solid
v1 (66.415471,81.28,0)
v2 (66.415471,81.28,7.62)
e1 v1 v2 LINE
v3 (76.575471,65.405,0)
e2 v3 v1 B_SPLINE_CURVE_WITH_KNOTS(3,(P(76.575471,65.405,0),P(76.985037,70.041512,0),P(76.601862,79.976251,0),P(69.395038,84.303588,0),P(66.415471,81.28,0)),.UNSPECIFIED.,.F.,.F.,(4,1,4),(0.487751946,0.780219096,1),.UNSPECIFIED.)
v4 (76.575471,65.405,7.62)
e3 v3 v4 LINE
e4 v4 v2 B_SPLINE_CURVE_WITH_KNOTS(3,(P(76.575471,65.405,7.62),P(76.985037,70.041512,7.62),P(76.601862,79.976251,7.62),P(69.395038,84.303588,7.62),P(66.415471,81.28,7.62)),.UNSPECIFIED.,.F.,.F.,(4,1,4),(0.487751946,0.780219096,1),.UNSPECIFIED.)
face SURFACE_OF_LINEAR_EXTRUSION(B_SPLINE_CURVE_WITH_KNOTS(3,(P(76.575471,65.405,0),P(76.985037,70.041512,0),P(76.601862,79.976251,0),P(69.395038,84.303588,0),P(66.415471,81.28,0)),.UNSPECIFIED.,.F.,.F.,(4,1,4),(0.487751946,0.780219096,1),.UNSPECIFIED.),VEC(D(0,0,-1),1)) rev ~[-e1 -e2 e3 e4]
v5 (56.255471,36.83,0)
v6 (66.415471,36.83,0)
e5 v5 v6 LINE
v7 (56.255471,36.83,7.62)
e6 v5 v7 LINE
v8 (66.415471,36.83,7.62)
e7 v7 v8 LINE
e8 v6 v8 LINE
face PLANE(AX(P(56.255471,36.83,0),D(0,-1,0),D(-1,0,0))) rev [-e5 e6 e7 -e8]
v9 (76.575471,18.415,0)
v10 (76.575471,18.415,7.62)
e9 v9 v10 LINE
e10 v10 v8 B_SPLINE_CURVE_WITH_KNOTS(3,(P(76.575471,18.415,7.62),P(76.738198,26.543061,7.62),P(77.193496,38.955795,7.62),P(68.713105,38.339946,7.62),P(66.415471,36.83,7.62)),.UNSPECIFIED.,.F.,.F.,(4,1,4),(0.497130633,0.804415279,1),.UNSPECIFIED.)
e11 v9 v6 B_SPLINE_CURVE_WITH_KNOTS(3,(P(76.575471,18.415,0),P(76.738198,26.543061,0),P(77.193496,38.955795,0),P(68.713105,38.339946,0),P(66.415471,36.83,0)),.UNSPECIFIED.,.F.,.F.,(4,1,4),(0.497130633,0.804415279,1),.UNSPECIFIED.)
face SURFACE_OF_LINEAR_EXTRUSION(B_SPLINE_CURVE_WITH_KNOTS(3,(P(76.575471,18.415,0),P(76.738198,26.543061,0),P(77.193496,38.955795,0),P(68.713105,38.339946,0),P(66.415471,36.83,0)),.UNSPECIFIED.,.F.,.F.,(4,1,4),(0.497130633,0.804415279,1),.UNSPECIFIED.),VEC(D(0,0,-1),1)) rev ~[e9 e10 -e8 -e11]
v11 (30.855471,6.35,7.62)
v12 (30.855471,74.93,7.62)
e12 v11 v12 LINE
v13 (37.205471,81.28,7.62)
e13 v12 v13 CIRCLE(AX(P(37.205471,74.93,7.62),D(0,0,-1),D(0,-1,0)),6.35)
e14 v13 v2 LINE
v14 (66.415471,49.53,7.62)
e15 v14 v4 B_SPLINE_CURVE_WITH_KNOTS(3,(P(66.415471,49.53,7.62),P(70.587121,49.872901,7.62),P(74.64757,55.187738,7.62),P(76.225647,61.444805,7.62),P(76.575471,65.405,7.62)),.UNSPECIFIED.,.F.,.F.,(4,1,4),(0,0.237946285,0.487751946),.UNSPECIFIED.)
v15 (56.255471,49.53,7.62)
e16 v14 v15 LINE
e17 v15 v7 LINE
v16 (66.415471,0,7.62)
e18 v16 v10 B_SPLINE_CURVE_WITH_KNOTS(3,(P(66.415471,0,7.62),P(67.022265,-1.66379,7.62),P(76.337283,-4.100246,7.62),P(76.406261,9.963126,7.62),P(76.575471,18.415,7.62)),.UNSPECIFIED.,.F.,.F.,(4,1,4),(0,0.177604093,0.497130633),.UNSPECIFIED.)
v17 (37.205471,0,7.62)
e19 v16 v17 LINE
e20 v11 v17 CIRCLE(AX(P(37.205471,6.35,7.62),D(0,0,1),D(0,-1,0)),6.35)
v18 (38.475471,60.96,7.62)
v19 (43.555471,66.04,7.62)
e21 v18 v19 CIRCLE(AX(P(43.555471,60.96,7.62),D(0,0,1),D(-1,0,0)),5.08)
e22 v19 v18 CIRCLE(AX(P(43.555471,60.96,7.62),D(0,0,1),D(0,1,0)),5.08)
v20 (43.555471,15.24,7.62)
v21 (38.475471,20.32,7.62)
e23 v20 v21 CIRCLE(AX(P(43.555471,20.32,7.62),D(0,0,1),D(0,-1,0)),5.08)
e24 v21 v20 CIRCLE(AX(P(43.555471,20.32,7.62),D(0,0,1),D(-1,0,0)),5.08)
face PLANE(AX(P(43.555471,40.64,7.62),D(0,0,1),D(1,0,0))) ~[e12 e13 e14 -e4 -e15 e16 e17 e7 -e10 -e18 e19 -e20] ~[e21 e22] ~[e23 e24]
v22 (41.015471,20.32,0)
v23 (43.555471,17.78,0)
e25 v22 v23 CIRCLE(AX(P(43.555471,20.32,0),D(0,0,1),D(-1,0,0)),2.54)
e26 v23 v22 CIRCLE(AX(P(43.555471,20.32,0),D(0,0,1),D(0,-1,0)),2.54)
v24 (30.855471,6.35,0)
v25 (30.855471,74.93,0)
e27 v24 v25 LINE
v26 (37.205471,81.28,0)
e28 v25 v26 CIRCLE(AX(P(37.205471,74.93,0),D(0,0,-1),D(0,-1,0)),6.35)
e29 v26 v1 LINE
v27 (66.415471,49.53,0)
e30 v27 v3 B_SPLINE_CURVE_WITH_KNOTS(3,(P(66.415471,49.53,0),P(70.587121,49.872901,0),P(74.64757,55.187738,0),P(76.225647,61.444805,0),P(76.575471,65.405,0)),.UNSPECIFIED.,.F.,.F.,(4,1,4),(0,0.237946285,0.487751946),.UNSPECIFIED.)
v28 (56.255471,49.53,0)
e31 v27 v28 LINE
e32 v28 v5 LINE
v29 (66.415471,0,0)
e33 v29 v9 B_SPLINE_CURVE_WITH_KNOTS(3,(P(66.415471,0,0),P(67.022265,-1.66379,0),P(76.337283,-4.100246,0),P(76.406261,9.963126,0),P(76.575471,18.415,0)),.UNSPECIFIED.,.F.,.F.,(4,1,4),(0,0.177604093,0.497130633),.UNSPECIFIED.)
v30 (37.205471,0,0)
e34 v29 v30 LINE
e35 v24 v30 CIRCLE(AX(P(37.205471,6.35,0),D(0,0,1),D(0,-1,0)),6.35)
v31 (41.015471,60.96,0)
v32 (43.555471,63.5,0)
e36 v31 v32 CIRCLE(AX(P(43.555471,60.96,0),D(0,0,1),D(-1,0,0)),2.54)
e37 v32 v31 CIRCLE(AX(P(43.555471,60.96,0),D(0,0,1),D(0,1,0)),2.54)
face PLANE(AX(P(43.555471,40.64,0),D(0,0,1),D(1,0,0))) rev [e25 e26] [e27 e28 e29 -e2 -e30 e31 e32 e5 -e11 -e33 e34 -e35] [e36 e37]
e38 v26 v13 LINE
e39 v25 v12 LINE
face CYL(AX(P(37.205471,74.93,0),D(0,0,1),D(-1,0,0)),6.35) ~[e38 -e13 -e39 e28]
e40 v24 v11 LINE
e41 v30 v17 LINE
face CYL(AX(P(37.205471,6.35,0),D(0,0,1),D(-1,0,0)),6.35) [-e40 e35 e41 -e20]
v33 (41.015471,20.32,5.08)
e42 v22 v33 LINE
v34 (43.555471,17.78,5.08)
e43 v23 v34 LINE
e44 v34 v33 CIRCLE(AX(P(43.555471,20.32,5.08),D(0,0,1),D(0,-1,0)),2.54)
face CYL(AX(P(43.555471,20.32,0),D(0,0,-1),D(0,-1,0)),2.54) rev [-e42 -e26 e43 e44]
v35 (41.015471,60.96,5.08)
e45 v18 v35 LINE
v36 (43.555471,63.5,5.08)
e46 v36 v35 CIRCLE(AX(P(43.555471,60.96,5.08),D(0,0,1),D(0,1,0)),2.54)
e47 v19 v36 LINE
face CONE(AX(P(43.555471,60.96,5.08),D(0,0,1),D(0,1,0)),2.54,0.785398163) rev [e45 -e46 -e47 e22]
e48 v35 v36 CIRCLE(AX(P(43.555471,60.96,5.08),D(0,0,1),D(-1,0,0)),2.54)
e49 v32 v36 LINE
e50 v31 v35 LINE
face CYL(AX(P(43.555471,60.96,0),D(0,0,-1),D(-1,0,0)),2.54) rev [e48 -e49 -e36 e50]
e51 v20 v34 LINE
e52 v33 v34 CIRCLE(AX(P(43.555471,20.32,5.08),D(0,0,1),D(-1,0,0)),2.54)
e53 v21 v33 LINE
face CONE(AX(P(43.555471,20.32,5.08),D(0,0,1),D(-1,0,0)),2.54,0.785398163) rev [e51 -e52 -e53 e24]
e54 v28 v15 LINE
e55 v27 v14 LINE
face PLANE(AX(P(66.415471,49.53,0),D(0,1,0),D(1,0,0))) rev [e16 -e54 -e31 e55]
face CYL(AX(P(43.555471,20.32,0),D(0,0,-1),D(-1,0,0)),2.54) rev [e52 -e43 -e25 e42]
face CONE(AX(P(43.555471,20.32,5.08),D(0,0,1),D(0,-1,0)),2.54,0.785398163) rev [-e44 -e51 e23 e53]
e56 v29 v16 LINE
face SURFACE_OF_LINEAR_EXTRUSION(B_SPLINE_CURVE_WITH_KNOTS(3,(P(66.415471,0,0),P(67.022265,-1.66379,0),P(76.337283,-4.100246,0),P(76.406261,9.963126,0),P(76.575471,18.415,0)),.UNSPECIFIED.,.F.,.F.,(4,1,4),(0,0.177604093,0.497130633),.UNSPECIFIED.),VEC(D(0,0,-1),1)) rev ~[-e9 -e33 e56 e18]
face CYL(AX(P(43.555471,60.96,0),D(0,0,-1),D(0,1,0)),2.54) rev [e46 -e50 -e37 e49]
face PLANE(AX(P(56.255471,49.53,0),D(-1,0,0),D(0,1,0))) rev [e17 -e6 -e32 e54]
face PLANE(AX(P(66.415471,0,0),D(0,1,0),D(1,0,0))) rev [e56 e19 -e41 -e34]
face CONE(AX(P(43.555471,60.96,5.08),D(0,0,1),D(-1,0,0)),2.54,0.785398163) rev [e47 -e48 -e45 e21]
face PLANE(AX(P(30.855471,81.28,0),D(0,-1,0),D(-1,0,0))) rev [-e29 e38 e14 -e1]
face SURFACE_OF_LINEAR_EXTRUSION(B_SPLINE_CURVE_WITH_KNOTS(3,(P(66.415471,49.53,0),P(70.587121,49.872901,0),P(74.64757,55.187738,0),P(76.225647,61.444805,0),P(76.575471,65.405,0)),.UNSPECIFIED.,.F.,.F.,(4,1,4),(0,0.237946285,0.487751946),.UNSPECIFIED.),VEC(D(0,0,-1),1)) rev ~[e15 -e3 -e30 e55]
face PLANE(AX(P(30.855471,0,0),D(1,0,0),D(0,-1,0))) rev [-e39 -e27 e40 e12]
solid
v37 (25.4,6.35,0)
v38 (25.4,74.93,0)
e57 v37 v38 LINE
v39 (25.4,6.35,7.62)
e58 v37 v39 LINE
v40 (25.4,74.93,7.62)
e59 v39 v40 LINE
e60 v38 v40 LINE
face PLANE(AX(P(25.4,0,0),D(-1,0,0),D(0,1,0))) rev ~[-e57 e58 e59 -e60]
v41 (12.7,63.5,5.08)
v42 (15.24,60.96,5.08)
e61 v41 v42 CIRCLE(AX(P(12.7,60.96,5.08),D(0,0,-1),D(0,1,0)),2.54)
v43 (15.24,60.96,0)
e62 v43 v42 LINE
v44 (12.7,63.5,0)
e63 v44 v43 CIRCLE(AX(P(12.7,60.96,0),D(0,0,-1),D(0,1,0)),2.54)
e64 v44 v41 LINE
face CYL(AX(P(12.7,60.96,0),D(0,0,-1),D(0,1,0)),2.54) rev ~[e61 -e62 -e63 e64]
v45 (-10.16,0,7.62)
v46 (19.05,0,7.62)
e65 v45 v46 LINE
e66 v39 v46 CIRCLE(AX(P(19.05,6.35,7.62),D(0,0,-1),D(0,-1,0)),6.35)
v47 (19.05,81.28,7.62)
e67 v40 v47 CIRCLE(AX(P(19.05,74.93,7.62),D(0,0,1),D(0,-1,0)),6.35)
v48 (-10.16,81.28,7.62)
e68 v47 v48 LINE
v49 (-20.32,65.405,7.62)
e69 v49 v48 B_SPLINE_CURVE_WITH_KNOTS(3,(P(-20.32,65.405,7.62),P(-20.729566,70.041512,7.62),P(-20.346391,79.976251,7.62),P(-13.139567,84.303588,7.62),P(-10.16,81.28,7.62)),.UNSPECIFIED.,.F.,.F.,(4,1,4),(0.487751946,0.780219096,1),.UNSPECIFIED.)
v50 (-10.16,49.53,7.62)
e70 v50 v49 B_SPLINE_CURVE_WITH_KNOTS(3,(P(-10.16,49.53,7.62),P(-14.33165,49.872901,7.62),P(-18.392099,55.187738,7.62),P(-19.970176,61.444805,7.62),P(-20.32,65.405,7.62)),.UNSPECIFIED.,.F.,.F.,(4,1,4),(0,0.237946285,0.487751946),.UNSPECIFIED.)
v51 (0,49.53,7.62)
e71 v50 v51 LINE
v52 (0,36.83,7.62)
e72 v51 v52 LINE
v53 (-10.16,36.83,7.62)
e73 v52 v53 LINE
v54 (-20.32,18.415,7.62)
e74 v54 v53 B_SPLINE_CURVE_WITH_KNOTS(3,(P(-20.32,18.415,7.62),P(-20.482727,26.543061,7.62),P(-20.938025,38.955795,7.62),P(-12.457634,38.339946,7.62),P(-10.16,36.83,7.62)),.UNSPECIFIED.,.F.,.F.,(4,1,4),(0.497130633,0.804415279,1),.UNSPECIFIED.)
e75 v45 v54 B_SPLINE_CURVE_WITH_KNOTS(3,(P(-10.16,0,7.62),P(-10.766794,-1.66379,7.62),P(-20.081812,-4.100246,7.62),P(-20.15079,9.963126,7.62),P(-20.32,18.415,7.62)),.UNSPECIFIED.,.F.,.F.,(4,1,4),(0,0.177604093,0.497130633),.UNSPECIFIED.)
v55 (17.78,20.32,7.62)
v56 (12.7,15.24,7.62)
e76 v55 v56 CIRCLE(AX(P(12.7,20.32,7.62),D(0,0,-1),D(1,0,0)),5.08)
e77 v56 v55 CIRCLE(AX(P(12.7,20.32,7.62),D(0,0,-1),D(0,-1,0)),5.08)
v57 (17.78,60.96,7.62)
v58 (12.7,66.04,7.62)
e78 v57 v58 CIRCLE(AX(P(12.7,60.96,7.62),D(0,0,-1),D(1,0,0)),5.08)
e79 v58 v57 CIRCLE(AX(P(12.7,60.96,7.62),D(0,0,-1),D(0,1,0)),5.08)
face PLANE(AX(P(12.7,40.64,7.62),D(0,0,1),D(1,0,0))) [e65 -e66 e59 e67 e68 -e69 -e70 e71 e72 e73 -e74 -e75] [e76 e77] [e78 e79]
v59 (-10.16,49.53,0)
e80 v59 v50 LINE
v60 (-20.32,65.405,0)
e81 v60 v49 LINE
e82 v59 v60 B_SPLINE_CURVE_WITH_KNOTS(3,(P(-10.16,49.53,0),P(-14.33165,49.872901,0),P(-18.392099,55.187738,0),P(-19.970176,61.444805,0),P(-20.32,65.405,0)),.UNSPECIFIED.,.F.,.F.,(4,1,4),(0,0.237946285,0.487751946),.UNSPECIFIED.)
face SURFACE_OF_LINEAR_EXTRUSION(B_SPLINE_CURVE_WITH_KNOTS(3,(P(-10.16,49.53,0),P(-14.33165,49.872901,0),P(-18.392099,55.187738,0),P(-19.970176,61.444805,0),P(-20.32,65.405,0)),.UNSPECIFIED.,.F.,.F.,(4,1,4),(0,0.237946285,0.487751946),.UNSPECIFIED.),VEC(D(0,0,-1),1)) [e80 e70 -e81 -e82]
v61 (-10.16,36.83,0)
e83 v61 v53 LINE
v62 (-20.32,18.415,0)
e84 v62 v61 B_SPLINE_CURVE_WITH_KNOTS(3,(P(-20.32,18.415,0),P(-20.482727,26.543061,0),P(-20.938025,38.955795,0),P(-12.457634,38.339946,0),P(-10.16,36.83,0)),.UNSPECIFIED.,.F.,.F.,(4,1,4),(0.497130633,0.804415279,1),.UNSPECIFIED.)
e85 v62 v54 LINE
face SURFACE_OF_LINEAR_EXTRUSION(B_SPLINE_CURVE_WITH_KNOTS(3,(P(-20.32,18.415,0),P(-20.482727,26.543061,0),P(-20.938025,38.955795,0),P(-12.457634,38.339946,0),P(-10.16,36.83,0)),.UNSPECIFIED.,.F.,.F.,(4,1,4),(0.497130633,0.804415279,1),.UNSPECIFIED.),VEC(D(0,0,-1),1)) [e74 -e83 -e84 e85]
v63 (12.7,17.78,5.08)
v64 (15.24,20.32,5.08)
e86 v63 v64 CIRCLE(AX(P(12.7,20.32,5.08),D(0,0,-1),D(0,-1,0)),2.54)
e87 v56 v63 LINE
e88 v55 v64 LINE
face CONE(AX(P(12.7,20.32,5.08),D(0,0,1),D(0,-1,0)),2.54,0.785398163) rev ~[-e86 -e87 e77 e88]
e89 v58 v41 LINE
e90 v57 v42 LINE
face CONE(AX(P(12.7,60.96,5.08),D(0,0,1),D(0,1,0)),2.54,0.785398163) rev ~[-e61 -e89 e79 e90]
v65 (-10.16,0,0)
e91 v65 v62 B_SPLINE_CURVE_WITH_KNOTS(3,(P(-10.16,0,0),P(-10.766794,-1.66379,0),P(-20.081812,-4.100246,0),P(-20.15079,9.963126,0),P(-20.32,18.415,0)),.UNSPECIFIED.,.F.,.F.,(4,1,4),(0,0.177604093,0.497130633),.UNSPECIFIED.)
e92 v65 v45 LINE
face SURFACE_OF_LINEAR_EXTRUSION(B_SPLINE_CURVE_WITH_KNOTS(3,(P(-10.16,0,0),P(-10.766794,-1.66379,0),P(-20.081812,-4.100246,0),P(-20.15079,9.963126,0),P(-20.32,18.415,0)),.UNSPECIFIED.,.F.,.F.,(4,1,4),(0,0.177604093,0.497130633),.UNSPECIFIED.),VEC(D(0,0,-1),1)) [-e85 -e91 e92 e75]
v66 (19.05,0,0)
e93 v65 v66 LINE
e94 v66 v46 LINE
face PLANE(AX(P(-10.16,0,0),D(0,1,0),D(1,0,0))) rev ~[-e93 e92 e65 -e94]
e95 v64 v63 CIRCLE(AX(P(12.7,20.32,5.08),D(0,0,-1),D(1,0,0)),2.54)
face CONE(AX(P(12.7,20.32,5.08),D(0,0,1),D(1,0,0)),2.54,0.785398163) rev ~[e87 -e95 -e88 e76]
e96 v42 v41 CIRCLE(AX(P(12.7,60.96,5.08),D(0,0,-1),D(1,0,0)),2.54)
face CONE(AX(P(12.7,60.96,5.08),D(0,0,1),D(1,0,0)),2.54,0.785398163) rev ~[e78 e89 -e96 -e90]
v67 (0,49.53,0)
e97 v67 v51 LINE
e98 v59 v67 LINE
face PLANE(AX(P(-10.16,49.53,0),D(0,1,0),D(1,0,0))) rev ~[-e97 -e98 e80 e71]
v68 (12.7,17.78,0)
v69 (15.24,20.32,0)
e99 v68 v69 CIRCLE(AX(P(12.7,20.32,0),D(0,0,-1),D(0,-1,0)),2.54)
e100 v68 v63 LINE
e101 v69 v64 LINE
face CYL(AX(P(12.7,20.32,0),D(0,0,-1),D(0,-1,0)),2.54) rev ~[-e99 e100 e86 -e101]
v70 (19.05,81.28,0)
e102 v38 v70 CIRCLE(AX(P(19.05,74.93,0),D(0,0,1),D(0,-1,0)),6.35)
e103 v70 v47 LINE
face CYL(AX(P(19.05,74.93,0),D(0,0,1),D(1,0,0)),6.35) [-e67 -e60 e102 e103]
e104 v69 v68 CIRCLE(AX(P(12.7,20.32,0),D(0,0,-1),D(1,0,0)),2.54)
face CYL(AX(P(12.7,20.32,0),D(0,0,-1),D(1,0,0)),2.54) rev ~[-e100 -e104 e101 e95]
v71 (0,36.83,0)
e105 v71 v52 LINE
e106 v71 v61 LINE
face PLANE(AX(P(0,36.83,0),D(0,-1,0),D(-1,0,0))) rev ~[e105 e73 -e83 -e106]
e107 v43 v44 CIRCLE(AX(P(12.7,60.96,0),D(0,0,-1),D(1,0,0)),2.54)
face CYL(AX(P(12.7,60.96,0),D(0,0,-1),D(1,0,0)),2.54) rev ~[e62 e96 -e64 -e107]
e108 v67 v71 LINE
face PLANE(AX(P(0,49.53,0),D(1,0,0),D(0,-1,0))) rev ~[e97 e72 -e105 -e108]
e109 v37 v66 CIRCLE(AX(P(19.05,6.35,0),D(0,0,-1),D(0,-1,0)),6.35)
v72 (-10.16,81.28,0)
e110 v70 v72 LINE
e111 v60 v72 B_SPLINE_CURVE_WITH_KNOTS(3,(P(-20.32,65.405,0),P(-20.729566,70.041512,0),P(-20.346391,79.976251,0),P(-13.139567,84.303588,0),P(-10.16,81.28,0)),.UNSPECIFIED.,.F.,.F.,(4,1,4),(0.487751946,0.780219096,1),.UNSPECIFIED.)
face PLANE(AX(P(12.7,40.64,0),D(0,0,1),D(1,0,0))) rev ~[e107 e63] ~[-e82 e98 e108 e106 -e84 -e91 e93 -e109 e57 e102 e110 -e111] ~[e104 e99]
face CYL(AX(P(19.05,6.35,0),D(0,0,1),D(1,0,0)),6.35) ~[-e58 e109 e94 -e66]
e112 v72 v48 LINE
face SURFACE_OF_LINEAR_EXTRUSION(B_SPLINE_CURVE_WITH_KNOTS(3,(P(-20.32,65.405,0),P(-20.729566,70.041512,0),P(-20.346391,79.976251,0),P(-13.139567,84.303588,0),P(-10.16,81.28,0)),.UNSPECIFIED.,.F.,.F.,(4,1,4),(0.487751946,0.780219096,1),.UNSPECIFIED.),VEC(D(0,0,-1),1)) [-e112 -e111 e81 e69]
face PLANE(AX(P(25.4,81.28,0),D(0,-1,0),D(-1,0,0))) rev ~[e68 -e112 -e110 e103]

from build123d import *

# Parameters (mm, degrees)
F1_DEPTH = 7.62
F2_R     = 6.35
F3_SIZE  = 2.54


with BuildPart() as f1:
    # F0 (on Top) → F1 (new body)
    with BuildSketch(Plane.XY):
        Polygon((0, 18.415), (0, 0), (12.7, 0), (25.4, 0), (25.4, 81.28), (12.7, 81.28), (0, 81.28), (0, 65.405), (0, 49.53), (0, 36.83), align=None)
        with BuildLine():
            ThreePointArc((15.24, 20.32), (14.4960512242, 18.5239487758), (12.7, 17.78))
            ThreePointArc((12.7, 17.78), (10.9039487758, 22.1160512242), (15.24, 20.32))
        make_face(mode=Mode.SUBTRACT)
        with BuildLine():
            ThreePointArc((15.24, 60.96), (10.9039487758, 59.1639487758), (12.7, 63.5))
            ThreePointArc((12.7, 63.5), (14.4960512242, 62.7560512242), (15.24, 60.96))
        make_face(mode=Mode.SUBTRACT)
        with BuildLine():
            Line((-10.16, 49.53), (0, 49.53))
            Line((0, 49.53), (0, 65.405))
            Line((0, 65.405), (-20.32, 65.405))
            add(Edge.make_bspline(
                [(-10.16, 49.53), (-14.331649676, 49.8729012967), (-18.3920992899, 55.1877378663), (-19.9701763147, 61.4448046081), (-20.32, 65.405)],
                knots=[0, 0, 0, 0, 0.2379462848, 0.4877519456, 0.4877519456, 0.4877519456, 0.4877519456], degree=3))
        make_face()
        with BuildLine():
            Line((-20.32, 65.405), (0, 65.405))
            Line((0, 65.405), (0, 81.28))
            Line((0, 81.28), (-10.16, 81.28))
            add(Edge.make_bspline(
                [(-20.32, 65.405), (-20.7295661244, 70.0415124684), (-20.3463914547, 79.9762511033), (-13.1395673379, 84.3035876751), (-10.16, 81.28)],
                knots=[0.4877519456, 0.4877519456, 0.4877519456, 0.4877519456, 0.780219096, 1, 1, 1, 1], degree=3))
        make_face()
        with BuildLine():
            Line((-20.32, 18.415), (0, 18.415))
            Line((0, 18.415), (0, 36.83))
            Line((0, 36.83), (-10.16, 36.83))
            add(Edge.make_bspline(
                [(-20.32, 18.415), (-20.4827266675, 26.5430610833), (-20.9380249073, 38.955794752), (-12.4576338451, 38.3399460251), (-10.16, 36.83)],
                knots=[0.4971306325, 0.4971306325, 0.4971306325, 0.4971306325, 0.8044152788, 1, 1, 1, 1], degree=3))
        make_face()
        with BuildLine():
            Line((-10.16, 0), (0, 0))
            Line((0, 0), (0, 18.415))
            Line((0, 18.415), (-20.32, 18.415))
            add(Edge.make_bspline(
                [(-10.16, 0), (-10.7667939737, -1.6637903173), (-20.0818121137, -4.1002458839), (-20.1507904755, 9.9631256242), (-20.32, 18.415)],
                knots=[0, 0, 0, 0, 0.1776040933, 0.4971306325, 0.4971306325, 0.4971306325, 0.4971306325], degree=3))
        make_face()
    extrude(amount=F1_DEPTH)

    # F2
    f2_edges = [f1.edges().sort_by_distance(p)[0] for p in [
        (25.4, 0, 3.81),
        (25.4, 81.28, 3.81),
    ]]
    fillet(f2_edges, radius=F2_R)

    # F3
    f3_edges = [f1.edges().sort_by_distance(p)[0] for p in [
        (10.16, 60.96, 7.62),
        (12.7, 22.86, 7.62),
    ]]
    chamfer(f3_edges, length=F3_SIZE)


with BuildPart() as f6_1:
    # F6: instance of F1
    add(f1.part.mirror(Plane(origin=(28.1277354807, 41.8248549104, 12.7), x_dir=(0, 1, 0), z_dir=(1, 0, 0))))


solid = Compound([f1.part, f6_1.part])
